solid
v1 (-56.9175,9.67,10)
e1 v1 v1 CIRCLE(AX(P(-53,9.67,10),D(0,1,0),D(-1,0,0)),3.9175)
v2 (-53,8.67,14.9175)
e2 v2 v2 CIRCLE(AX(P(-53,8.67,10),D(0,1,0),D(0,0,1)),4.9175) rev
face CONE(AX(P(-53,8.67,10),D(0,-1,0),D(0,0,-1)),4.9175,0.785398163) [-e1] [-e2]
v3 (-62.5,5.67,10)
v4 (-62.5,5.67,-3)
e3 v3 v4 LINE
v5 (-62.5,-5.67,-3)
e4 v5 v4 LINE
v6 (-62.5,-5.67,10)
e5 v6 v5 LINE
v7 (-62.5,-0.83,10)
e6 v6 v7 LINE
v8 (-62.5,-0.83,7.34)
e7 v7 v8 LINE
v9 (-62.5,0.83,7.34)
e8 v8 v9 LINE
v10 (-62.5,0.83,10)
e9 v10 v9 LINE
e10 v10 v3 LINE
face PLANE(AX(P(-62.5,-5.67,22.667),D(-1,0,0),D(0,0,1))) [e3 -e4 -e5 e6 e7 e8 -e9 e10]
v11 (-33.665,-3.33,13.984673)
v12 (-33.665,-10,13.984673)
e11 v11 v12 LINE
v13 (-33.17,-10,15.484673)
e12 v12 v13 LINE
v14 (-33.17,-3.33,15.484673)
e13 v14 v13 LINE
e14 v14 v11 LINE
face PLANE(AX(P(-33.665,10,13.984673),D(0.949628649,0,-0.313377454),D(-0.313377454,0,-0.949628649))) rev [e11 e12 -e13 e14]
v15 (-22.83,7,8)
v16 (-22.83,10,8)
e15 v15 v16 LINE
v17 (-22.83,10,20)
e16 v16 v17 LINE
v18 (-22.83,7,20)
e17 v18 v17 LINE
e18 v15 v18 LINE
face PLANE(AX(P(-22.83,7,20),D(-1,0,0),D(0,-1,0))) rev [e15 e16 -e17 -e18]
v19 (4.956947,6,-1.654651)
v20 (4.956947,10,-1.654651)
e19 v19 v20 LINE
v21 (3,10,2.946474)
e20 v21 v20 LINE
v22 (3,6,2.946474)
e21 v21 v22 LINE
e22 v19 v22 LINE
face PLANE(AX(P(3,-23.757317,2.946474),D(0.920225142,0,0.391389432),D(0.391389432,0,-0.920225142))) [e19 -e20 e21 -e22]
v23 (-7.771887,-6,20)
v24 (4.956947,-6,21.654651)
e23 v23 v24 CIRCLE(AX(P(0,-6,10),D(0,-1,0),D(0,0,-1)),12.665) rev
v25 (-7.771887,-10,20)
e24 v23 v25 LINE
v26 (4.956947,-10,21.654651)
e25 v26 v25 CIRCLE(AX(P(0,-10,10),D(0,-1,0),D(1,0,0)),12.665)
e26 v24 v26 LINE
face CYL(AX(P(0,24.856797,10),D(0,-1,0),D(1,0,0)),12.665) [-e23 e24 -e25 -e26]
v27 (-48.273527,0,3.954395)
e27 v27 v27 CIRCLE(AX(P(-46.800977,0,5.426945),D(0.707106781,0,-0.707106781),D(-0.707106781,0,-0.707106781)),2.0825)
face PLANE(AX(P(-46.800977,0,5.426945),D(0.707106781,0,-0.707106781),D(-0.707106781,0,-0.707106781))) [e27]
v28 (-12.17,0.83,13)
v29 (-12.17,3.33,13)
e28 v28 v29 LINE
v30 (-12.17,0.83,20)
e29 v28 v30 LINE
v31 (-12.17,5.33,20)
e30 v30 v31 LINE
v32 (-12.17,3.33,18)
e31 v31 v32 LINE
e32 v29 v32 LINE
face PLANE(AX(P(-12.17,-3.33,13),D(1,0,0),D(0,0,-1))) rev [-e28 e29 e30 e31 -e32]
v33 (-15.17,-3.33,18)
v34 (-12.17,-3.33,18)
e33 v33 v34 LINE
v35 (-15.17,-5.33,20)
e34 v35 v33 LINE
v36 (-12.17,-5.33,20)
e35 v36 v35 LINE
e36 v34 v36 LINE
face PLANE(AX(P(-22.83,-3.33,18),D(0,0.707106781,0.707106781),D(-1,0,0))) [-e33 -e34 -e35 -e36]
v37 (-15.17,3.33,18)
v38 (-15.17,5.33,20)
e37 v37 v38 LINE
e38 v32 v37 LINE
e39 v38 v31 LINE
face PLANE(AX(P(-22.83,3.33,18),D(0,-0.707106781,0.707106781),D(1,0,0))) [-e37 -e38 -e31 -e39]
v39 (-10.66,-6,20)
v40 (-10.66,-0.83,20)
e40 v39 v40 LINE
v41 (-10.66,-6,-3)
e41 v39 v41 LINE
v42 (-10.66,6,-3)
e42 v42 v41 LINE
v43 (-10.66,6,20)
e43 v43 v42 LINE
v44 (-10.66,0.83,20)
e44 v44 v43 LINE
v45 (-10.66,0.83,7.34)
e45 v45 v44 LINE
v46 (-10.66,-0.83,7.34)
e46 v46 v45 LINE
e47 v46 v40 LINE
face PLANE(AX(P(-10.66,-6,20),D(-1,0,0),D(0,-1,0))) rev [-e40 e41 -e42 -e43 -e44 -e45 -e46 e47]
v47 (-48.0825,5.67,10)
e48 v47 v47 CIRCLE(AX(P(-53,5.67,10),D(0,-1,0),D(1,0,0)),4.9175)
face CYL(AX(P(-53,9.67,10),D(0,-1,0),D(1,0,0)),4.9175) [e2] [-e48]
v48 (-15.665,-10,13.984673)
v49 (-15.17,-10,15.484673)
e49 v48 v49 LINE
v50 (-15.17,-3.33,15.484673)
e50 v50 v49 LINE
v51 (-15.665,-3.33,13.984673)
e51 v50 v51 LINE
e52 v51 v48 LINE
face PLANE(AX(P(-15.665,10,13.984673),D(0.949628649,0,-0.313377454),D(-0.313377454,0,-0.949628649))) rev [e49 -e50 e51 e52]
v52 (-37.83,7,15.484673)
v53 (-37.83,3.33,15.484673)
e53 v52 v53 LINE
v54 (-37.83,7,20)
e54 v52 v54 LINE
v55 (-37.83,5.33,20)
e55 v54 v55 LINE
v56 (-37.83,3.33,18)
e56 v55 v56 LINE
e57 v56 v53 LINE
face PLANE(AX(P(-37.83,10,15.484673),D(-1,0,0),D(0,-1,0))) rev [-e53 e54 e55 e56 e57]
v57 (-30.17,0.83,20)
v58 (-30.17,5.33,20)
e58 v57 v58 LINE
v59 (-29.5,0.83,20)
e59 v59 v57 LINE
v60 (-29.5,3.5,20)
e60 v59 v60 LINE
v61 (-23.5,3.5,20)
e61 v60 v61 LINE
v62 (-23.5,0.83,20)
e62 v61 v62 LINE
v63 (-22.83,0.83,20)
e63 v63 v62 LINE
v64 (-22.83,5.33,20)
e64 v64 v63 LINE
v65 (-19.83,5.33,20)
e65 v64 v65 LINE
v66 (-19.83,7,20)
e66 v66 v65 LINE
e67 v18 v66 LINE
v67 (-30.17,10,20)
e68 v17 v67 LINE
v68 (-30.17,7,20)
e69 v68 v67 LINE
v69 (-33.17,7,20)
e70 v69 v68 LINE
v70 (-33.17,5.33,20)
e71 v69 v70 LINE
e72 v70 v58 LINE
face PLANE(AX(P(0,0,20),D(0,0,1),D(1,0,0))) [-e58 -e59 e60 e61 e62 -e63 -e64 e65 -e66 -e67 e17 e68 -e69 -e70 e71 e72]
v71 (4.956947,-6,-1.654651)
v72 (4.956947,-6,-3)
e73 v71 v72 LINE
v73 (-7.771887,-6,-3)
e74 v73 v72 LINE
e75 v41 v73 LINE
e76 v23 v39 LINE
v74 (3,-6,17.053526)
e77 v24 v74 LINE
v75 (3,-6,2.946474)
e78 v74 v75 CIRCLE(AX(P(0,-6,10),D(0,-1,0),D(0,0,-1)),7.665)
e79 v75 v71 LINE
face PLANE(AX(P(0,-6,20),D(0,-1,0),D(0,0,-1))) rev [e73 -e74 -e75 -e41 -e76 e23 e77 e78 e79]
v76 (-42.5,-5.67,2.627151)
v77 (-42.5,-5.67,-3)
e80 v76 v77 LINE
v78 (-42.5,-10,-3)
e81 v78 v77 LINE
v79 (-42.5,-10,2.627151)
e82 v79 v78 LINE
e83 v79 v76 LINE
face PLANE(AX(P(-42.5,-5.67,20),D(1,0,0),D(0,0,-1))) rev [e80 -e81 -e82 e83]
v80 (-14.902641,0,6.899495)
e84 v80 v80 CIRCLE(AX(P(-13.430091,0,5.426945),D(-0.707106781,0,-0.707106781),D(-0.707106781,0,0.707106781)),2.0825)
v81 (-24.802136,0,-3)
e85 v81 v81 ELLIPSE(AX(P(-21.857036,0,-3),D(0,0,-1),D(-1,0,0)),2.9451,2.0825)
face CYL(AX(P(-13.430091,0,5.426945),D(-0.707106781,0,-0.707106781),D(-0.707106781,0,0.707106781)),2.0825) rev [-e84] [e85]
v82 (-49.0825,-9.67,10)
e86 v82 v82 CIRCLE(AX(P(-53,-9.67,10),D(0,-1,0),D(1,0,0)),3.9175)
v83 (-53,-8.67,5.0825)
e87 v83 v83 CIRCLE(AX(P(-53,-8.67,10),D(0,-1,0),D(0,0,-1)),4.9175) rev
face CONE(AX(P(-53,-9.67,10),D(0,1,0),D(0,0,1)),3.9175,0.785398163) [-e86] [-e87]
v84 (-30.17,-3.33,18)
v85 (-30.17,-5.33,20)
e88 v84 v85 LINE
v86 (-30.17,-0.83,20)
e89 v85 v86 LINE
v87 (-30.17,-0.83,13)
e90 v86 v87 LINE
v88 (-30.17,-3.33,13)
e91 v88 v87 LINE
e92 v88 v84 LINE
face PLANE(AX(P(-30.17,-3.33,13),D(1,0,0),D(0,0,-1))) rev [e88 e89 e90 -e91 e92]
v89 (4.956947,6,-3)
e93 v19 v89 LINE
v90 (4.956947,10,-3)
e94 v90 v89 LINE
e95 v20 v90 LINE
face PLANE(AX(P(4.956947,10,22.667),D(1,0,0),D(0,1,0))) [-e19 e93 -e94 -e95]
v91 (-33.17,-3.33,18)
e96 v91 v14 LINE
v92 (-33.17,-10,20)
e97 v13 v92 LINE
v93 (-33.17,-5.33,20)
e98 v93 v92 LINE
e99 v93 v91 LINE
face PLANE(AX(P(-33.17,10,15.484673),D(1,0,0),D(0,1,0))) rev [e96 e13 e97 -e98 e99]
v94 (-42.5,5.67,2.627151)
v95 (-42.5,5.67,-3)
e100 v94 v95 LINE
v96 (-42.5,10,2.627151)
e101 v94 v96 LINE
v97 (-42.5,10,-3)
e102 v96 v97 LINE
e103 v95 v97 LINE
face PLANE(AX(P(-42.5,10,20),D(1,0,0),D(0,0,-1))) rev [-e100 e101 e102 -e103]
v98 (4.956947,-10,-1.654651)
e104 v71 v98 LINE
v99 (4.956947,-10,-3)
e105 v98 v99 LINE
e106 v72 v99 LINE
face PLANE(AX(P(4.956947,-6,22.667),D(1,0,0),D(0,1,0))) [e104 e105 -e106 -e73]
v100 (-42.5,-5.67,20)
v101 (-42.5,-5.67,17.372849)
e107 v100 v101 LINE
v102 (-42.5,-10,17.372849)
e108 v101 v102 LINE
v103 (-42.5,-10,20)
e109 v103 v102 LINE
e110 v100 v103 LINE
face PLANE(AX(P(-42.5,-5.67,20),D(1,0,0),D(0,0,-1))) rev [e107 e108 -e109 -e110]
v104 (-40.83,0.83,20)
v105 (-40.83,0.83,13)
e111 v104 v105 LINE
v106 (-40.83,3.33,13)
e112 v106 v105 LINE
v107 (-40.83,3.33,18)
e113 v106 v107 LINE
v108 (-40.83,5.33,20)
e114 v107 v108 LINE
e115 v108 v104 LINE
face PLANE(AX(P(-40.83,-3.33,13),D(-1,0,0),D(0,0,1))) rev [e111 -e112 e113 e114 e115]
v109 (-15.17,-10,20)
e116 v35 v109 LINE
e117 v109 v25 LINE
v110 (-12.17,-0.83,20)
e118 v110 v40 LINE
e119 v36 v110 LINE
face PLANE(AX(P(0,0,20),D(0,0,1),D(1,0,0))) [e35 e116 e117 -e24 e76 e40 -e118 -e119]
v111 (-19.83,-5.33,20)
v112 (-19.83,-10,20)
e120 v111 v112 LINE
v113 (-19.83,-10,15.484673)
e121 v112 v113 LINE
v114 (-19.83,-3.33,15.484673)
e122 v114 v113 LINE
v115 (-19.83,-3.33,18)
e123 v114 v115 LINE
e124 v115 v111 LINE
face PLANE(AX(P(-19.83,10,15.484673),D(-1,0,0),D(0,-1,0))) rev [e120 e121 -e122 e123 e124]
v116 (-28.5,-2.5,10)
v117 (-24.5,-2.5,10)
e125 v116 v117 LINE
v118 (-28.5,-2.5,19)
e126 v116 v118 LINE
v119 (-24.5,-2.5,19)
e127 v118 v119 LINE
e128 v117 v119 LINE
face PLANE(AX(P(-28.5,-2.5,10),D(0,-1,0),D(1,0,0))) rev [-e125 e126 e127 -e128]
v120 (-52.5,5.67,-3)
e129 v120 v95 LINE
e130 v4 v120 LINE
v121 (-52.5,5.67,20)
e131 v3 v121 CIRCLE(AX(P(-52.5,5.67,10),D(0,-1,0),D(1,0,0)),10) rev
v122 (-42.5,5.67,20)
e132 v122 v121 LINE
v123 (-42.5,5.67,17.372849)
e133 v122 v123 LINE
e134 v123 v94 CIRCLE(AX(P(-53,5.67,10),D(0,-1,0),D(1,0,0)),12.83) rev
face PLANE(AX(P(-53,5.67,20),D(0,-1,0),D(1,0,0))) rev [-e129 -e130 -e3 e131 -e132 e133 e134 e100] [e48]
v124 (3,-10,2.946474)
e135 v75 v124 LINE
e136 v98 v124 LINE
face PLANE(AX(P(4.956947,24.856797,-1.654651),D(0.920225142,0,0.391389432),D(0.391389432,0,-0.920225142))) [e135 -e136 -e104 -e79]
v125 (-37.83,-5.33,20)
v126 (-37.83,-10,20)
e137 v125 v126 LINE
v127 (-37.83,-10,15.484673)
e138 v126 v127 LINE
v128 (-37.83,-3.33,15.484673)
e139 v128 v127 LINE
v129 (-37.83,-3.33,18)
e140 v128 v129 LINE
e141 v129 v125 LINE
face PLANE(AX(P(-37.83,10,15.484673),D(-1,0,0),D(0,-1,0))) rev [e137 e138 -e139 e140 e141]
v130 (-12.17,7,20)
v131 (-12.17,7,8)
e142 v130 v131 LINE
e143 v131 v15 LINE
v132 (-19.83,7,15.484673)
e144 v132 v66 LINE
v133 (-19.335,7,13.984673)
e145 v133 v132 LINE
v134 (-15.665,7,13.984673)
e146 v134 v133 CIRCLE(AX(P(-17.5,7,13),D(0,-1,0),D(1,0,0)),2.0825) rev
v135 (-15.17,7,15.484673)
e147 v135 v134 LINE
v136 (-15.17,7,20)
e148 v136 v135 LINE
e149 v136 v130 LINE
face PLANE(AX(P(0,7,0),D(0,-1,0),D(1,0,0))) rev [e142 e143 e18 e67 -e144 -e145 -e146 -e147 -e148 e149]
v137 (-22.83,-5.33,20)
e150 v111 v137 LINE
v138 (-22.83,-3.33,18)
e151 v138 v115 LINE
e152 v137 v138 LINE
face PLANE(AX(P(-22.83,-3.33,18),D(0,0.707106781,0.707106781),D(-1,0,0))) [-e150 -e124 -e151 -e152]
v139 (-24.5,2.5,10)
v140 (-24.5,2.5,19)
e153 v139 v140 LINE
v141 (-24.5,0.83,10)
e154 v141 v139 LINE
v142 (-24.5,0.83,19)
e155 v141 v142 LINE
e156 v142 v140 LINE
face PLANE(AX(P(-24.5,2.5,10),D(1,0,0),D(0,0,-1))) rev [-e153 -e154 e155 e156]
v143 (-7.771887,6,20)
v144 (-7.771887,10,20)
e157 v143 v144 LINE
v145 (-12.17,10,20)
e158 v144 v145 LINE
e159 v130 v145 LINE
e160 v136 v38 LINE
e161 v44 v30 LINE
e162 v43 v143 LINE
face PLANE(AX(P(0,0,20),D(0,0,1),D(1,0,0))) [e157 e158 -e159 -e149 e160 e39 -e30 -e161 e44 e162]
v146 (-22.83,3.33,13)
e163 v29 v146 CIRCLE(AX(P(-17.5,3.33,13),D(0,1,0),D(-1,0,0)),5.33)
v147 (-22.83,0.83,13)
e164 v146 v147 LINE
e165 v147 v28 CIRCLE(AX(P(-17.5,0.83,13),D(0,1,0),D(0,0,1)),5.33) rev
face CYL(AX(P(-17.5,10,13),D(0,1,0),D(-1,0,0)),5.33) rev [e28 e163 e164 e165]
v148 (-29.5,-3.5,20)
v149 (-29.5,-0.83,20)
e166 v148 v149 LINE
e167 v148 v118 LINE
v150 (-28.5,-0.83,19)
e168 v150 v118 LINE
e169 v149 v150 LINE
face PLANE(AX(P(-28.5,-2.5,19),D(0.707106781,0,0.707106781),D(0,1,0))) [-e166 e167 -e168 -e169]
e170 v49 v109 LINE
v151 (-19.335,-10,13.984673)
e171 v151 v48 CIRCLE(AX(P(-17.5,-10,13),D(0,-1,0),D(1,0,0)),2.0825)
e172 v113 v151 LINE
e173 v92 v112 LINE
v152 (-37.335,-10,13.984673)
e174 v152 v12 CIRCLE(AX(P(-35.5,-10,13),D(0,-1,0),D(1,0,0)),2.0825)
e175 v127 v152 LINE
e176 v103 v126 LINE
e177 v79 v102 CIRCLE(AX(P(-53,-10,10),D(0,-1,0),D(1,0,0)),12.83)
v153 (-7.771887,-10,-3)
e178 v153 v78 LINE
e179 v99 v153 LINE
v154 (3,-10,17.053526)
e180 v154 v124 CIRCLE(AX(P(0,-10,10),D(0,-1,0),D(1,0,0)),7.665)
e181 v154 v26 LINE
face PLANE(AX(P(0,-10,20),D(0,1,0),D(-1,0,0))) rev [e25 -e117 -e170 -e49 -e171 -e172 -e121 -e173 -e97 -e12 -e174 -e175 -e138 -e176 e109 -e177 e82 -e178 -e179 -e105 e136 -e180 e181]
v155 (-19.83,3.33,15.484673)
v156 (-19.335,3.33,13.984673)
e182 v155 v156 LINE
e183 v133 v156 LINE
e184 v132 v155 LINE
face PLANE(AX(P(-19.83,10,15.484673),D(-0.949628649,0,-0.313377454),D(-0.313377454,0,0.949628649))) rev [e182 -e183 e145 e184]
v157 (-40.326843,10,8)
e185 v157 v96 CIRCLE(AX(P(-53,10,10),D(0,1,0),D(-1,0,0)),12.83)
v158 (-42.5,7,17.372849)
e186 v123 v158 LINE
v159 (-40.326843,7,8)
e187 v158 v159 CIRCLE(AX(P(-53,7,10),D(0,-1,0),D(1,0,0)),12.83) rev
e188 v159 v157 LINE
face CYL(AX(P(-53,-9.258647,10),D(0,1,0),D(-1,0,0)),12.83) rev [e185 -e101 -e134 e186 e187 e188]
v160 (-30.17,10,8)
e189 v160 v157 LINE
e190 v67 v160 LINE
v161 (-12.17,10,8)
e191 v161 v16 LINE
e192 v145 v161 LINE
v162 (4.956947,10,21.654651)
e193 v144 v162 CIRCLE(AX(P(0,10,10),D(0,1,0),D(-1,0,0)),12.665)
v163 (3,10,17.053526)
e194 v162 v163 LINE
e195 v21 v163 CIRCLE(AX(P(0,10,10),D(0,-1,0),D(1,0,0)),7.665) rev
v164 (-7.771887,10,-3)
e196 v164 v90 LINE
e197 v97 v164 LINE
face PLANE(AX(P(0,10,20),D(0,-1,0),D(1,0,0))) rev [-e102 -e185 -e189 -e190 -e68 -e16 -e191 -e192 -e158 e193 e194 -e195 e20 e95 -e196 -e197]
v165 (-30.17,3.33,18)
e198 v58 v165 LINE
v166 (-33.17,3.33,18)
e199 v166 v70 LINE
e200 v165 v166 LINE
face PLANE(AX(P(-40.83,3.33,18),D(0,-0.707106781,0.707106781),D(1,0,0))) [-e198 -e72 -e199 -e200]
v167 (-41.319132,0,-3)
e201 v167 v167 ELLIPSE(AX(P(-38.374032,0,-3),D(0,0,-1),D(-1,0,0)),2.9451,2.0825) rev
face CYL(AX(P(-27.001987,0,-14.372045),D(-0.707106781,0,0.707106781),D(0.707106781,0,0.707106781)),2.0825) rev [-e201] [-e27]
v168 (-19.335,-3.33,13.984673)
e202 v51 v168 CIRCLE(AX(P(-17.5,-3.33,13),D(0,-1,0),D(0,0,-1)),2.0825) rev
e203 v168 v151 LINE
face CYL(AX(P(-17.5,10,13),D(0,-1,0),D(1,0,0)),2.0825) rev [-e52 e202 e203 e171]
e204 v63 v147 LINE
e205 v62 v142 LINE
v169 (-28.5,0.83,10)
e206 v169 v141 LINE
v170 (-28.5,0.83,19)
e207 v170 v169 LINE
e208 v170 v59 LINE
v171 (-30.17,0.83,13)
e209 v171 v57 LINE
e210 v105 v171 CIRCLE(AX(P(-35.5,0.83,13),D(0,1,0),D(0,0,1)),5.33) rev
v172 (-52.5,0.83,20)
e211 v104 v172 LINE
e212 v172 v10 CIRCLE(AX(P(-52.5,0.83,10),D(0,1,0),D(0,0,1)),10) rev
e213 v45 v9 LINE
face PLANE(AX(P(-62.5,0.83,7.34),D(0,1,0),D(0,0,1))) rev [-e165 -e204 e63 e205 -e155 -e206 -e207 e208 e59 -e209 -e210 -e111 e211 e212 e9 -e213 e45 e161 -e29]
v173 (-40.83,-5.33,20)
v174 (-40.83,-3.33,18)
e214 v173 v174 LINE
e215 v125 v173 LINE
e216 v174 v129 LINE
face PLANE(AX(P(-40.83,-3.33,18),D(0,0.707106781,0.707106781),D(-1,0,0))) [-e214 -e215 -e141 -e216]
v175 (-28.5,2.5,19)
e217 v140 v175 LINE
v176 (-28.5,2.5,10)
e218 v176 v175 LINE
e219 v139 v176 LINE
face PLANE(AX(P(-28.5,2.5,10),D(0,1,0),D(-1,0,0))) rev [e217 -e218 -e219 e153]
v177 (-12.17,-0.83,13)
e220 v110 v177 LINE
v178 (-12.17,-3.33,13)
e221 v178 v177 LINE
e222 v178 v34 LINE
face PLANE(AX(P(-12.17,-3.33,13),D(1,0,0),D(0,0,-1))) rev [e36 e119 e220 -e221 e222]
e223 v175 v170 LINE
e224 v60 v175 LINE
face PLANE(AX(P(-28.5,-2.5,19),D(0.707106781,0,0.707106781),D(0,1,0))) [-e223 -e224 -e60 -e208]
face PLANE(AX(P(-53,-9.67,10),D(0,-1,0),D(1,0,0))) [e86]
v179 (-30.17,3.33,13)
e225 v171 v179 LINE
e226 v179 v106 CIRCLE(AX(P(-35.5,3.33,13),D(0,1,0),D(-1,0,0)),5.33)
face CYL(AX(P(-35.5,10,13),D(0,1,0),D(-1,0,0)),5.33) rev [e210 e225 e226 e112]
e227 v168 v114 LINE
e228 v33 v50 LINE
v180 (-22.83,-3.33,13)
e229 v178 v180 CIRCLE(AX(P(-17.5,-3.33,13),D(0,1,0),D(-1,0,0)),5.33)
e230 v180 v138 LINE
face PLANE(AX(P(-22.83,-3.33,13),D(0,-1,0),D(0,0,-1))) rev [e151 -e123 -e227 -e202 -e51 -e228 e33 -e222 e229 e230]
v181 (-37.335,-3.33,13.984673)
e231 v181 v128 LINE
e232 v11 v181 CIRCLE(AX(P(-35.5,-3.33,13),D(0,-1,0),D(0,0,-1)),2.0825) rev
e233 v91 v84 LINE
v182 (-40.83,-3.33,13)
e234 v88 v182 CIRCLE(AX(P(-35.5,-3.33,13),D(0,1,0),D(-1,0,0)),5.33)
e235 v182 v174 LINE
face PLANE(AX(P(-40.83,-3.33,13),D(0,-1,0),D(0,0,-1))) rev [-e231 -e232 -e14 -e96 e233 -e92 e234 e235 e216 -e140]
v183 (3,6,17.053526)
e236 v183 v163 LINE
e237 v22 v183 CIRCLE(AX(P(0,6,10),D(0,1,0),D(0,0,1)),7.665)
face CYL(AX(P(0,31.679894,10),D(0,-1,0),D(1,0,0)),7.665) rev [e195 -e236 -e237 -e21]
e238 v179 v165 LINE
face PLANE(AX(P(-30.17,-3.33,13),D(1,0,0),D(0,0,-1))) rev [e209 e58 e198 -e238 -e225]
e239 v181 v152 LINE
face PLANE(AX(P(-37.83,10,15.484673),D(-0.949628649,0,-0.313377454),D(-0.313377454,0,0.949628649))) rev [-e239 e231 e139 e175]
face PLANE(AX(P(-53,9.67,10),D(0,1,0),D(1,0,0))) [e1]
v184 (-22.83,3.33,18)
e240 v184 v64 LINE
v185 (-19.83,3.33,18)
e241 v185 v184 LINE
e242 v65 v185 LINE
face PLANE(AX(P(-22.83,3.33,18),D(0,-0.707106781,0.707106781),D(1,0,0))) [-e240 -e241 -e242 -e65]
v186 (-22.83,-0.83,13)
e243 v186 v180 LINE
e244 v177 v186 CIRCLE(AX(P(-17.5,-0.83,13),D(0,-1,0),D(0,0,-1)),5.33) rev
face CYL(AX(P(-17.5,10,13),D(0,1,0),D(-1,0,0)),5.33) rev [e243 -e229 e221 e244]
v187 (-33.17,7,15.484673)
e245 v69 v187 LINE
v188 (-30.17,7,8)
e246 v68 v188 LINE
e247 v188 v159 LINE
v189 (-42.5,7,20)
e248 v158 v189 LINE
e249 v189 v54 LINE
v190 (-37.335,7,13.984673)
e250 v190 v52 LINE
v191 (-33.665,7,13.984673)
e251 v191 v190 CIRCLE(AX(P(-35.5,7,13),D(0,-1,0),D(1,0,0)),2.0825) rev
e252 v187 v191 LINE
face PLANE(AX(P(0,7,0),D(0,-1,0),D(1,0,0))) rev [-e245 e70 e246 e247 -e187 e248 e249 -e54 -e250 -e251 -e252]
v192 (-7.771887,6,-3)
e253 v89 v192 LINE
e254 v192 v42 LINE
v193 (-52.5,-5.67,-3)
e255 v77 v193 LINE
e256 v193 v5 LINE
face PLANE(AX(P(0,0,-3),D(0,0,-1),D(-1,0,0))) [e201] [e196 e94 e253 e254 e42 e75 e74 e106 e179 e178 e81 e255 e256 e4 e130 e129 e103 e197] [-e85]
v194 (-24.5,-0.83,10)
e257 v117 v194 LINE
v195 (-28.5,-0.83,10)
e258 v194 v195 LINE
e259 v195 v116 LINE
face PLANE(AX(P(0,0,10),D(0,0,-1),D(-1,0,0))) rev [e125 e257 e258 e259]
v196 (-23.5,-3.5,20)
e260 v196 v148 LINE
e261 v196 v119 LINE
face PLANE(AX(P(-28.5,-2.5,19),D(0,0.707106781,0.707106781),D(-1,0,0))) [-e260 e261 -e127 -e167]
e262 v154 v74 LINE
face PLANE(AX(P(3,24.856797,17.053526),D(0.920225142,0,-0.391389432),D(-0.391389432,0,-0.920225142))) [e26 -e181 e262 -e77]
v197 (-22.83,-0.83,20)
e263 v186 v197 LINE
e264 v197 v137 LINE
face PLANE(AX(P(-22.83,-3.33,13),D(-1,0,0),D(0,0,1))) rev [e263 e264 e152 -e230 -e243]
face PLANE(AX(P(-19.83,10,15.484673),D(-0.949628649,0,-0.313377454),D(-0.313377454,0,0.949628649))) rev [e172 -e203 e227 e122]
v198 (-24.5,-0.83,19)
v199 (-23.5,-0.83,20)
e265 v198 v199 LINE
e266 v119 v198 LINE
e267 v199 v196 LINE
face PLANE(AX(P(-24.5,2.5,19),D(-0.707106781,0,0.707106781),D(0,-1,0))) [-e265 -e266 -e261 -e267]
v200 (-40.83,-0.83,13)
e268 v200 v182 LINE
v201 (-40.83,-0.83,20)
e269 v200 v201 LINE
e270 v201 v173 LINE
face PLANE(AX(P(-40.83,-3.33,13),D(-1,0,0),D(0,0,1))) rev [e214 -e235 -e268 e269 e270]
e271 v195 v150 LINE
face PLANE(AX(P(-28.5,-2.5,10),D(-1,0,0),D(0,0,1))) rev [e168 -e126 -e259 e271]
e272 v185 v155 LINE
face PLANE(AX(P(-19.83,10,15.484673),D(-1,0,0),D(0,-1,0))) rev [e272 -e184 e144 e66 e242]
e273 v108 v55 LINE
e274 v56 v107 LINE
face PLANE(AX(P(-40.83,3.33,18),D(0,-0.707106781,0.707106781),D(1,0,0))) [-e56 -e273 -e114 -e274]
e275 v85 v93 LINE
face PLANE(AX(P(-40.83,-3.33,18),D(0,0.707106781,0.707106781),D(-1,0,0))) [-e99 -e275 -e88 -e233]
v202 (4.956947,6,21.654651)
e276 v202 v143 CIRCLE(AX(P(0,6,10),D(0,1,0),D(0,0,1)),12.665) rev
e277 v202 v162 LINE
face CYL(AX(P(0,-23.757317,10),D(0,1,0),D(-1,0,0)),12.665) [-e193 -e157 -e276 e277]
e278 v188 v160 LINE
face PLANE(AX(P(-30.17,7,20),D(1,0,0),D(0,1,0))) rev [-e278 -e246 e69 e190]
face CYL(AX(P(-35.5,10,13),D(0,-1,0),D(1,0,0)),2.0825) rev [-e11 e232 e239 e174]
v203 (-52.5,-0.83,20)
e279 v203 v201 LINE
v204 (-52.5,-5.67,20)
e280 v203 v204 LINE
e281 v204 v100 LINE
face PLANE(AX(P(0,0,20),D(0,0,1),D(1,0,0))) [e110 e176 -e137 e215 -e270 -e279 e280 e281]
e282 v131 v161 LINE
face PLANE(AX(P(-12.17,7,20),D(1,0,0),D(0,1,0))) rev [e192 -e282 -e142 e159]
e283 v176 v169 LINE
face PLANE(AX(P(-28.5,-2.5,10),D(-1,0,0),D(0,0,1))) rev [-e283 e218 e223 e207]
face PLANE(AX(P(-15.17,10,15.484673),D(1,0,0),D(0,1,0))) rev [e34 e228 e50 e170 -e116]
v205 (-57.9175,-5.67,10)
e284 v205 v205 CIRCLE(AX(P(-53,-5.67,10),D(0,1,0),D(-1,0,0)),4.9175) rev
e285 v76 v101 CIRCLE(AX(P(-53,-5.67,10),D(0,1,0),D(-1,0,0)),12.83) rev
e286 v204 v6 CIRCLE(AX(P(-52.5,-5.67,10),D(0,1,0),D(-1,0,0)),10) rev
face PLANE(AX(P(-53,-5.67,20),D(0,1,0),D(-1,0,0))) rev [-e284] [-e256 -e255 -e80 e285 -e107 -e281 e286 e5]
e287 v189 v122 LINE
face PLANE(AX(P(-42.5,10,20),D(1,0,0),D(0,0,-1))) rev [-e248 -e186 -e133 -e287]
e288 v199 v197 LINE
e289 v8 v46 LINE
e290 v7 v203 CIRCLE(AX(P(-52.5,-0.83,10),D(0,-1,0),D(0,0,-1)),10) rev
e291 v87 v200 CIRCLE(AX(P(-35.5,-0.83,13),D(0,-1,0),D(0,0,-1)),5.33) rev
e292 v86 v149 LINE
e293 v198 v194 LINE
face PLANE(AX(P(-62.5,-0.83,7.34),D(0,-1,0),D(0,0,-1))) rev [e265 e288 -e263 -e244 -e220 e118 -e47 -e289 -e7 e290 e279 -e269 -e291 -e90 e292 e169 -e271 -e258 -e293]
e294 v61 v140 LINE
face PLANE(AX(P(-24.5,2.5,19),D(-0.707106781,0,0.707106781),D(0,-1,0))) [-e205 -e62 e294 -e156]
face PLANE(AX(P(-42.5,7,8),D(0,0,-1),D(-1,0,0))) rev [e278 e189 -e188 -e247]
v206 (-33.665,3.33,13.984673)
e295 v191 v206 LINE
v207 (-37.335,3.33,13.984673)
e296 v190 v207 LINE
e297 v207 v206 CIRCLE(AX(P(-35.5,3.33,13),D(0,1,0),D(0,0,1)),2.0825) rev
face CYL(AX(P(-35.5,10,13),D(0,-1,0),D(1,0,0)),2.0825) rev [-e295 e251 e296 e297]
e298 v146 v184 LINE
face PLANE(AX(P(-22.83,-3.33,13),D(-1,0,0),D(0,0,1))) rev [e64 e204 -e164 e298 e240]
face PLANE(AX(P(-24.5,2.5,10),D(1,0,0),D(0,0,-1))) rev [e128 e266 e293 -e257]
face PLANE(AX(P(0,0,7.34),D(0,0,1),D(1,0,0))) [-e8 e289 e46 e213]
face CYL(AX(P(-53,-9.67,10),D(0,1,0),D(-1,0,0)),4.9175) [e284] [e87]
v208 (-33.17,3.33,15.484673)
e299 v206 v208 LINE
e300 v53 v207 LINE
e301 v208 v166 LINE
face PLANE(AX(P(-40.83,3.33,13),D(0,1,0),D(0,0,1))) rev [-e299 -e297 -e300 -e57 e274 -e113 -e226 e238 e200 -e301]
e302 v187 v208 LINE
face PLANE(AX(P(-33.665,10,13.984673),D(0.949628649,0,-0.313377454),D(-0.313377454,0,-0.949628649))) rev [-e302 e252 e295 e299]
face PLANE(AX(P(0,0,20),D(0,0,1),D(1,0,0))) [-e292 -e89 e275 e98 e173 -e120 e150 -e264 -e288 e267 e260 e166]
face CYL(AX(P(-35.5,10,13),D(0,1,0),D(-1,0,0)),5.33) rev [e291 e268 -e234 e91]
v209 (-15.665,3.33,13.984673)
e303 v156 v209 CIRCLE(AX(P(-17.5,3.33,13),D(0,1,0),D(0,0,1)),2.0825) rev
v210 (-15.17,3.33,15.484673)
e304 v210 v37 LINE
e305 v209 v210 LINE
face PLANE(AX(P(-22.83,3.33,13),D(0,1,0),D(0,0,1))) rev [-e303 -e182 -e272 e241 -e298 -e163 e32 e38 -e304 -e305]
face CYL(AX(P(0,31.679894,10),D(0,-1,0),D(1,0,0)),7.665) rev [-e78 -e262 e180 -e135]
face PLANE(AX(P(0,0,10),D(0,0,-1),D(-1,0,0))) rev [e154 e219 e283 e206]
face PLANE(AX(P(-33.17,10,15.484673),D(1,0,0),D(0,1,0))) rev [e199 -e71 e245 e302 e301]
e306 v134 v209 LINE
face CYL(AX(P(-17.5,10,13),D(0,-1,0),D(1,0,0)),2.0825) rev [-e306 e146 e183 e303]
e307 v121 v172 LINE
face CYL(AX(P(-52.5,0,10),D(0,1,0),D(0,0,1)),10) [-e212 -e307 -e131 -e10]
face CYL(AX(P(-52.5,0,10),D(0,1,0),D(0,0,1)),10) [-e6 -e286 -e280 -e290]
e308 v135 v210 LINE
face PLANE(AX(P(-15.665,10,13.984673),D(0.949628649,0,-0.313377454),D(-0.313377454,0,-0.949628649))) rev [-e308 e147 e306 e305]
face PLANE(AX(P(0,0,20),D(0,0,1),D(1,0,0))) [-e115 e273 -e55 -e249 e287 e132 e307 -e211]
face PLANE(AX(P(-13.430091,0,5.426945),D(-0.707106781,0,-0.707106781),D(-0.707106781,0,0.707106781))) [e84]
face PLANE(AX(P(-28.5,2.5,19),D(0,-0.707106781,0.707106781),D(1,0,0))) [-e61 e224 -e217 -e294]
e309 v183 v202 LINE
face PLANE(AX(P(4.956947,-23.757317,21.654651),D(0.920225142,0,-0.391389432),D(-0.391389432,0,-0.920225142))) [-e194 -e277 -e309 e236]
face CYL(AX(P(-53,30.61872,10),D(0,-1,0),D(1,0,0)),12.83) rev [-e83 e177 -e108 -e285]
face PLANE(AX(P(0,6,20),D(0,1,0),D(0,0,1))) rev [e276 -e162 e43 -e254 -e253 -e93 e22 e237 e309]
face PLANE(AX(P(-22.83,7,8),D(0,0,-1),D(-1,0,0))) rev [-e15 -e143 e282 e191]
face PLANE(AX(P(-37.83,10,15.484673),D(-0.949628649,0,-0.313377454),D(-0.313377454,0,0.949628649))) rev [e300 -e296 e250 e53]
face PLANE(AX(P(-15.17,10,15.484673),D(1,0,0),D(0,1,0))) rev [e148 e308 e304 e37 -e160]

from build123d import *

# Parameters (mm, degrees)
BOSS_EXTRUDE7_DEPTH      = 20
SKETCH2_R                = 4.9175
BOSS_EXTRUDE2_DEPTH      = 4
CUT_EXTRUDE1_REACH       = 70.602
SKETCH3_R                = 7.665
SKETCH4_W                = 4
SKETCH4_H                = 5
CUT_EXTRUDE2_DEPTH       = 10
BOSS_EXTRUDE4_DEPTH      = 4
BOSS_EXTRUDE5_START      = -4
BOSS_EXTRUDE5_DEPTH      = 4
SKETCH25_R               = 12.83
SKETCH25_R_2             = 4.9175
CUT_EXTRUDE9_DEPTH       = 4.33
CUT_EXTRUDE10_START      = -4.33
CUT_EXTRUDE10_DEPTH      = 4.33
CUT_EXTRUDE5_DEPTH       = 70.42587576
SKETCH17_W               = 10.66
SKETCH17_H               = 6.66
CUT_EXTRUDE6_DEPTH       = 7
SKETCH18_W               = 3.2475
SKETCH18_H               = 6.66
SKETCH19_W               = 3.2475
SKETCH19_H               = 6.66
SKETCH20_W               = 51.84
SKETCH20_H               = 1.66
CUT_EXTRUDE7_DEPTH       = 12.66
CHAMFER2_SIZE            = 1
CHAMFER3_SIZE            = 1
CHAMFER4_SIZE            = 2
FILLET1_R                = 10
BOSS_EXTRUDE13_REACH     = 70.3
SKETCH23_W               = 10.34
SKETCH23_H               = 1.66
BOSS_EXTRUDE14_DEPTH     = 0.360269713
SKETCH24_W               = 12.33
SKETCH24_H               = 12
SKETCH24_W_2             = 10.66
CUT_EXTRUDE8_DEPTH       = 3
CHAMFER5_SIZE            = 1
CUT_EXTRUDE11_DEPTH      = 14
CUT_EXTRUDE11_DEPTH_BACK = 14
SKETCH27_R               = 2.0825
SKETCH28_R               = 2.0825
CUT_EXTRUDE12_DEPTH      = 14


with BuildPart() as part:
    # Sketch16 → Boss-Extrude7 (new body)
    with BuildSketch(Plane.XY):
        Polygon((-42.5, -10), (0, -10), (3, -10), (3, -6), (0, -6), (-10.66, -6), (-10.66, 6), (0, 6), (3, 6), (3, 10), (0, 10), (-42.5, 10), (-42.5, 5.67), (-53, 5.67), (-62.5, 5.67), (-62.5, -5.67), (-53, -5.67), (-42.5, -5.67), align=None)
    extrude(amount=BOSS_EXTRUDE7_DEPTH)

    # Sketch2 → Boss-Extrude2 (add)
    with BuildSketch(Plane.XZ.offset(5.67)):
        with Locations(Location((-53, 10, 0), (0, 0, 180))):
            Circle(SKETCH2_R)
    boss_extrude2 = extrude(amount=BOSS_EXTRUDE2_DEPTH)

    # Cut-Extrude1: up to this face of the body (flat: up to its plane)
    cut_extrude1_end = Plane(part.part.faces().sort_by_distance((-19.75, 10, 10))[0])
    # Sketch3 → Cut-Extrude1 (cut, up to the picked face)
    with BuildSketch(Plane.XZ.offset(10), mode=Mode.PRIVATE) as cut_extrude1_sk1:
        with Locations((0, 10)):
            Circle(SKETCH3_R)
    cut_extrude1_tool1 = split(extrude(cut_extrude1_sk1.sketch, amount=-CUT_EXTRUDE1_REACH, mode=Mode.PRIVATE), bisect_by=cut_extrude1_end, keep=Keep.BOTH, mode=Mode.PRIVATE)
    add(cut_extrude1_tool1.solids().sort_by(Axis((0, -10, 10), (0, 1, 0)))[0], mode=Mode.SUBTRACT)

    # Mirror1: Boss-Extrude2 across plane
    add(boss_extrude2.mirror(Plane.ZX))

    # Sketch4 → Cut-Extrude2 (cut)
    with BuildSketch(Plane.XY.offset(20)):
        with Locations((-26.5, 0)):
            Rectangle(SKETCH4_W, SKETCH4_H)
    extrude(amount=-CUT_EXTRUDE2_DEPTH, mode=Mode.SUBTRACT)

    # Sketch10 → Boss-Extrude4 (add)
    with BuildSketch(Plane.XZ.offset(10)):
        with BuildLine():
            Line((3, 17.053525714), (4.956947162, 21.654651425))
            ThreePointArc((4.956947162, 21.654651425), (-12.665, 10), (4.956947162, -1.654651425))
            Line((4.956947162, -1.654651425), (3, 2.946474286))
            ThreePointArc((3, 2.946474286), (-7.665, 10), (3, 17.053525714))
        make_face()
    extrude(amount=-BOSS_EXTRUDE4_DEPTH)

    # Sketch11 → Boss-Extrude5 (add)
    with BuildSketch(Plane(origin=(0, 10, 0), x_dir=(1, 0, 0), z_dir=(0, 1, 0)).offset(BOSS_EXTRUDE5_START)):
        with BuildLine():
            Line((4.956947162, -21.654651425), (3, -17.053525714))
            ThreePointArc((3, -17.053525714), (-7.665, -10), (3, -2.946474286))
            Line((3, -2.946474286), (4.956947162, 1.654651425))
            ThreePointArc((4.956947162, 1.654651425), (-1.632617278, 2.559330628), (-7.771886837, 0))
            Line((-7.771886837, 0), (-10.66, 0))
            Line((-10.66, 0), (-10.66, -20))
            Line((-10.66, -20), (-7.771886837, -20))
            ThreePointArc((-7.771886837, -20), (-1.632617278, -22.559330628), (4.956947162, -21.654651425))
        make_face()
    extrude(amount=BOSS_EXTRUDE5_DEPTH)

    # Sketch25 → Cut-Extrude9 (cut)
    with BuildSketch(Plane.XZ.offset(10)):
        with Locations((-53, 10)):
            Circle(SKETCH25_R)
        with Locations(Location((-53, 10, 0), (0, 0, 180))):
            Circle(SKETCH25_R_2, mode=Mode.SUBTRACT)
    extrude(amount=-CUT_EXTRUDE9_DEPTH, mode=Mode.SUBTRACT)

    # Sketch26 → Cut-Extrude10 (cut)
    with BuildSketch(Plane(origin=(0, 10, 0), x_dir=(1, 0, 0), z_dir=(0, 1, 0)).offset(CUT_EXTRUDE10_START)):
        with BuildLine():
            Line((-42.5, -2.627151161), (-42.5, -17.372848839))
            ThreePointArc((-42.5, -17.372848839), (-40.17, -10), (-42.5, -2.627151161))
        make_face()
    extrude(amount=CUT_EXTRUDE10_DEPTH, mode=Mode.SUBTRACT)

    # Sketch13 → Cut-Extrude5 (cut, through all)
    with BuildSketch(Plane.XZ.offset(10)):
        with BuildLine():
            Line((-37.83, 15.484673169), (-37.83, 20))
            Line((-37.83, 20), (-33.17, 20))
            Line((-33.17, 20), (-33.17, 15.484673169))
            Line((-33.17, 15.484673169), (-33.665, 13.984673169))
            ThreePointArc((-33.665, 13.984673169), (-35.5, 10.9175), (-37.335, 13.984673169))
            Line((-37.335, 13.984673169), (-37.83, 15.484673169))
        make_face()
        with BuildLine():
            Line((-19.83, 15.484673169), (-19.83, 20))
            Line((-19.83, 20), (-15.17, 20))
            Line((-15.17, 20), (-15.17, 15.484673169))
            Line((-15.17, 15.484673169), (-15.665, 13.984673169))
            ThreePointArc((-15.665, 13.984673169), (-17.5, 10.9175), (-19.335, 13.984673169))
            Line((-19.335, 13.984673169), (-19.83, 15.484673169))
        make_face()
    extrude(amount=-CUT_EXTRUDE5_DEPTH, mode=Mode.SUBTRACT)

    # Sketch17 → Cut-Extrude6 (cut)
    with BuildSketch(Plane.XY.offset(20)):
        with Locations((-35.5, 0)):
            Rectangle(SKETCH17_W, SKETCH17_H)
        with Locations((-17.5, 0)):
            Rectangle(SKETCH17_W, SKETCH17_H)
    extrude(amount=-CUT_EXTRUDE6_DEPTH, mode=Mode.SUBTRACT)

    # Sketch18 → Cut-Revolve1 (revolve, cut)
    with BuildSketch(Plane.XY.offset(13)):
        with Locations((-39.20625, 0)):
            Rectangle(SKETCH18_W, SKETCH18_H)
    revolve(axis=Axis((-35.5, 10, 13), (0, -1, 0)), mode=Mode.SUBTRACT)

    # Sketch19 → Cut-Revolve2 (revolve, cut)
    with BuildSketch(Plane.XY.offset(13)):
        with Locations((-21.20625, 0)):
            Rectangle(SKETCH19_W, SKETCH19_H)
    revolve(axis=Axis((-17.5, 10, 13), (0, -1, 0)), mode=Mode.SUBTRACT)

    # Sketch20 → Cut-Extrude7 (cut)
    with BuildSketch(Plane.XY.offset(20)):
        with Locations((-36.58, 0)):
            Rectangle(SKETCH20_W, SKETCH20_H)
    extrude(amount=-CUT_EXTRUDE7_DEPTH, mode=Mode.SUBTRACT)

    # Chamfer2
    chamfer2_edges = [part.edges().sort_by_distance(p)[0] for p in [
        (-48.0825, -9.67, 10),
    ]]
    chamfer(chamfer2_edges, length=CHAMFER2_SIZE)

    # Chamfer3
    chamfer3_edges = [part.edges().sort_by_distance(p)[0] for p in [
        (-48.0825, 9.67, 10),
    ]]
    chamfer(chamfer3_edges, length=CHAMFER3_SIZE)

    # Chamfer4
    chamfer4_edges = [part.edges().sort_by_distance(p)[0] for p in [
        (-31.67, -3.33, 20),
        (-31.67, 3.33, 20),
        (-39.33, 3.33, 20),
        (-39.33, -3.33, 20),
        (-13.67, -3.33, 20),
        (-13.67, 3.33, 20),
        (-21.33, 3.33, 20),
        (-21.33, -3.33, 20),
    ]]
    chamfer(chamfer4_edges, length=CHAMFER4_SIZE)

    # Fillet1
    # the kernel refuses this fillet: 10 mm, written as the material it takes off along each edge
    with BuildSketch(Plane(origin=(-62.5, 30.67, 0), x_dir=(1, 0, 0), z_dir=(0, -1, 0))) as fillet1_piece_1:
        with BuildLine():
            CenterArc((FILLET1_R, FILLET1_R), FILLET1_R, 180, 90)
            Line((0, FILLET1_R), (0, 0))
            Line((0, 0), (FILLET1_R, 0))
        make_face()
    extrude(amount=61.34, mode=Mode.SUBTRACT)
    with BuildSketch(Plane(origin=(-62.5, 30.67, 20), x_dir=(1, 0, 0), z_dir=(0, -1, 0)), Plane(origin=(-62.5, 24.17, 20), x_dir=(1, 0, 0), z_dir=(0, -1, 0))) as fillet1_piece_2:
        with BuildLine():
            CenterArc((FILLET1_R, -FILLET1_R), FILLET1_R, 90, 90)
            Line((0, -FILLET1_R), (0, 0))
            Line((0, 0), (FILLET1_R, 0))
        make_face()
    extrude(amount=54.84, mode=Mode.SUBTRACT)

    # Sketch22 → Boss-Extrude13 (add, up to next)
    with BuildSketch(Plane(origin=(0, 0, -3), x_dir=(-1, 0, 0), z_dir=(0, 0, -1)), mode=Mode.PRIVATE) as boss_extrude13_sk1:
        Polygon((62.5, 5.67), (52.5, 5.67), (42.5, 5.67), (42.5, 10), (7.771886837, 10), (-4.956947162, 10), (-4.956947162, 6), (7.771886837, 6), (10.66, 6), (10.66, -6), (7.771886837, -6), (-4.956947162, -6), (-4.956947162, -10), (7.771886837, -10), (42.5, -10), (42.5, -5.67), (52.5, -5.67), (62.5, -5.67), (62.5, -0.83), (62.139730287, -0.83), (62.139730287, 0.83), (62.5, 0.83), align=None)
    boss_extrude13_tool1 = extrude(boss_extrude13_sk1.sketch, amount=-BOSS_EXTRUDE13_REACH, mode=Mode.PRIVATE) - part.part
    add(boss_extrude13_tool1.solids().sort_by_distance((-29.508071, 0, -3))[0])

    # Sketch23 → Boss-Extrude14 (add)
    with BuildSketch(Plane.ZY.offset(62.139730287)):
        with Locations((2.17, 0)):
            Rectangle(SKETCH23_W, SKETCH23_H)
    extrude(amount=BOSS_EXTRUDE14_DEPTH)

    # Sketch24 → Cut-Extrude8 (cut)
    with BuildSketch(Plane(origin=(0, 10, 0), x_dir=(1, 0, 0), z_dir=(0, 1, 0))):
        with Locations((-36.335, -14)):
            Rectangle(SKETCH24_W, SKETCH24_H)
        with Locations((-17.5, -14)):
            Rectangle(SKETCH24_W_2, SKETCH24_H)
    extrude(amount=-CUT_EXTRUDE8_DEPTH, mode=Mode.SUBTRACT)

    # Chamfer5
    chamfer5_edges = [part.edges().sort_by_distance(p)[0] for p in [
        (-24.5, 1.665, 20),
        (-28.5, -1.665, 20),
        (-26.5, -2.5, 20),
        (-24.5, -1.665, 20),
        (-26.5, 2.5, 20),
        (-28.5, 1.665, 20),
    ]]
    chamfer(chamfer5_edges, length=CHAMFER5_SIZE)

    # Sketch27 → Cut-Extrude11 (cut, two sides: drawn at the far end of the back side and taken through both)
    with BuildSketch(Plane(origin=(-16.214466094, 0, 16.214466094), x_dir=(0, 1, 0), z_dir=(0.7071067811865389, 0, -0.7071067811865561)).offset(-CUT_EXTRUDE11_DEPTH_BACK)):
        with Locations(Location((0, -29.255858544, 0), (0, 0, 270))):
            Circle(SKETCH27_R)
    extrude(amount=CUT_EXTRUDE11_DEPTH + CUT_EXTRUDE11_DEPTH_BACK, mode=Mode.SUBTRACT)

    # Sketch28 → Cut-Extrude12 (cut)
    with BuildSketch(Plane(origin=(-13.901067812, 0, -13.901067812), x_dir=(0, -1, 0), z_dir=(-0.7071067811865389, 0, -0.7071067811865561))):
        with Locations(Location((0, 13.333937944, 0), (0, 0, 90))):
            Circle(SKETCH28_R)
    extrude(amount=-CUT_EXTRUDE12_DEPTH, mode=Mode.SUBTRACT)


solid = part.part
